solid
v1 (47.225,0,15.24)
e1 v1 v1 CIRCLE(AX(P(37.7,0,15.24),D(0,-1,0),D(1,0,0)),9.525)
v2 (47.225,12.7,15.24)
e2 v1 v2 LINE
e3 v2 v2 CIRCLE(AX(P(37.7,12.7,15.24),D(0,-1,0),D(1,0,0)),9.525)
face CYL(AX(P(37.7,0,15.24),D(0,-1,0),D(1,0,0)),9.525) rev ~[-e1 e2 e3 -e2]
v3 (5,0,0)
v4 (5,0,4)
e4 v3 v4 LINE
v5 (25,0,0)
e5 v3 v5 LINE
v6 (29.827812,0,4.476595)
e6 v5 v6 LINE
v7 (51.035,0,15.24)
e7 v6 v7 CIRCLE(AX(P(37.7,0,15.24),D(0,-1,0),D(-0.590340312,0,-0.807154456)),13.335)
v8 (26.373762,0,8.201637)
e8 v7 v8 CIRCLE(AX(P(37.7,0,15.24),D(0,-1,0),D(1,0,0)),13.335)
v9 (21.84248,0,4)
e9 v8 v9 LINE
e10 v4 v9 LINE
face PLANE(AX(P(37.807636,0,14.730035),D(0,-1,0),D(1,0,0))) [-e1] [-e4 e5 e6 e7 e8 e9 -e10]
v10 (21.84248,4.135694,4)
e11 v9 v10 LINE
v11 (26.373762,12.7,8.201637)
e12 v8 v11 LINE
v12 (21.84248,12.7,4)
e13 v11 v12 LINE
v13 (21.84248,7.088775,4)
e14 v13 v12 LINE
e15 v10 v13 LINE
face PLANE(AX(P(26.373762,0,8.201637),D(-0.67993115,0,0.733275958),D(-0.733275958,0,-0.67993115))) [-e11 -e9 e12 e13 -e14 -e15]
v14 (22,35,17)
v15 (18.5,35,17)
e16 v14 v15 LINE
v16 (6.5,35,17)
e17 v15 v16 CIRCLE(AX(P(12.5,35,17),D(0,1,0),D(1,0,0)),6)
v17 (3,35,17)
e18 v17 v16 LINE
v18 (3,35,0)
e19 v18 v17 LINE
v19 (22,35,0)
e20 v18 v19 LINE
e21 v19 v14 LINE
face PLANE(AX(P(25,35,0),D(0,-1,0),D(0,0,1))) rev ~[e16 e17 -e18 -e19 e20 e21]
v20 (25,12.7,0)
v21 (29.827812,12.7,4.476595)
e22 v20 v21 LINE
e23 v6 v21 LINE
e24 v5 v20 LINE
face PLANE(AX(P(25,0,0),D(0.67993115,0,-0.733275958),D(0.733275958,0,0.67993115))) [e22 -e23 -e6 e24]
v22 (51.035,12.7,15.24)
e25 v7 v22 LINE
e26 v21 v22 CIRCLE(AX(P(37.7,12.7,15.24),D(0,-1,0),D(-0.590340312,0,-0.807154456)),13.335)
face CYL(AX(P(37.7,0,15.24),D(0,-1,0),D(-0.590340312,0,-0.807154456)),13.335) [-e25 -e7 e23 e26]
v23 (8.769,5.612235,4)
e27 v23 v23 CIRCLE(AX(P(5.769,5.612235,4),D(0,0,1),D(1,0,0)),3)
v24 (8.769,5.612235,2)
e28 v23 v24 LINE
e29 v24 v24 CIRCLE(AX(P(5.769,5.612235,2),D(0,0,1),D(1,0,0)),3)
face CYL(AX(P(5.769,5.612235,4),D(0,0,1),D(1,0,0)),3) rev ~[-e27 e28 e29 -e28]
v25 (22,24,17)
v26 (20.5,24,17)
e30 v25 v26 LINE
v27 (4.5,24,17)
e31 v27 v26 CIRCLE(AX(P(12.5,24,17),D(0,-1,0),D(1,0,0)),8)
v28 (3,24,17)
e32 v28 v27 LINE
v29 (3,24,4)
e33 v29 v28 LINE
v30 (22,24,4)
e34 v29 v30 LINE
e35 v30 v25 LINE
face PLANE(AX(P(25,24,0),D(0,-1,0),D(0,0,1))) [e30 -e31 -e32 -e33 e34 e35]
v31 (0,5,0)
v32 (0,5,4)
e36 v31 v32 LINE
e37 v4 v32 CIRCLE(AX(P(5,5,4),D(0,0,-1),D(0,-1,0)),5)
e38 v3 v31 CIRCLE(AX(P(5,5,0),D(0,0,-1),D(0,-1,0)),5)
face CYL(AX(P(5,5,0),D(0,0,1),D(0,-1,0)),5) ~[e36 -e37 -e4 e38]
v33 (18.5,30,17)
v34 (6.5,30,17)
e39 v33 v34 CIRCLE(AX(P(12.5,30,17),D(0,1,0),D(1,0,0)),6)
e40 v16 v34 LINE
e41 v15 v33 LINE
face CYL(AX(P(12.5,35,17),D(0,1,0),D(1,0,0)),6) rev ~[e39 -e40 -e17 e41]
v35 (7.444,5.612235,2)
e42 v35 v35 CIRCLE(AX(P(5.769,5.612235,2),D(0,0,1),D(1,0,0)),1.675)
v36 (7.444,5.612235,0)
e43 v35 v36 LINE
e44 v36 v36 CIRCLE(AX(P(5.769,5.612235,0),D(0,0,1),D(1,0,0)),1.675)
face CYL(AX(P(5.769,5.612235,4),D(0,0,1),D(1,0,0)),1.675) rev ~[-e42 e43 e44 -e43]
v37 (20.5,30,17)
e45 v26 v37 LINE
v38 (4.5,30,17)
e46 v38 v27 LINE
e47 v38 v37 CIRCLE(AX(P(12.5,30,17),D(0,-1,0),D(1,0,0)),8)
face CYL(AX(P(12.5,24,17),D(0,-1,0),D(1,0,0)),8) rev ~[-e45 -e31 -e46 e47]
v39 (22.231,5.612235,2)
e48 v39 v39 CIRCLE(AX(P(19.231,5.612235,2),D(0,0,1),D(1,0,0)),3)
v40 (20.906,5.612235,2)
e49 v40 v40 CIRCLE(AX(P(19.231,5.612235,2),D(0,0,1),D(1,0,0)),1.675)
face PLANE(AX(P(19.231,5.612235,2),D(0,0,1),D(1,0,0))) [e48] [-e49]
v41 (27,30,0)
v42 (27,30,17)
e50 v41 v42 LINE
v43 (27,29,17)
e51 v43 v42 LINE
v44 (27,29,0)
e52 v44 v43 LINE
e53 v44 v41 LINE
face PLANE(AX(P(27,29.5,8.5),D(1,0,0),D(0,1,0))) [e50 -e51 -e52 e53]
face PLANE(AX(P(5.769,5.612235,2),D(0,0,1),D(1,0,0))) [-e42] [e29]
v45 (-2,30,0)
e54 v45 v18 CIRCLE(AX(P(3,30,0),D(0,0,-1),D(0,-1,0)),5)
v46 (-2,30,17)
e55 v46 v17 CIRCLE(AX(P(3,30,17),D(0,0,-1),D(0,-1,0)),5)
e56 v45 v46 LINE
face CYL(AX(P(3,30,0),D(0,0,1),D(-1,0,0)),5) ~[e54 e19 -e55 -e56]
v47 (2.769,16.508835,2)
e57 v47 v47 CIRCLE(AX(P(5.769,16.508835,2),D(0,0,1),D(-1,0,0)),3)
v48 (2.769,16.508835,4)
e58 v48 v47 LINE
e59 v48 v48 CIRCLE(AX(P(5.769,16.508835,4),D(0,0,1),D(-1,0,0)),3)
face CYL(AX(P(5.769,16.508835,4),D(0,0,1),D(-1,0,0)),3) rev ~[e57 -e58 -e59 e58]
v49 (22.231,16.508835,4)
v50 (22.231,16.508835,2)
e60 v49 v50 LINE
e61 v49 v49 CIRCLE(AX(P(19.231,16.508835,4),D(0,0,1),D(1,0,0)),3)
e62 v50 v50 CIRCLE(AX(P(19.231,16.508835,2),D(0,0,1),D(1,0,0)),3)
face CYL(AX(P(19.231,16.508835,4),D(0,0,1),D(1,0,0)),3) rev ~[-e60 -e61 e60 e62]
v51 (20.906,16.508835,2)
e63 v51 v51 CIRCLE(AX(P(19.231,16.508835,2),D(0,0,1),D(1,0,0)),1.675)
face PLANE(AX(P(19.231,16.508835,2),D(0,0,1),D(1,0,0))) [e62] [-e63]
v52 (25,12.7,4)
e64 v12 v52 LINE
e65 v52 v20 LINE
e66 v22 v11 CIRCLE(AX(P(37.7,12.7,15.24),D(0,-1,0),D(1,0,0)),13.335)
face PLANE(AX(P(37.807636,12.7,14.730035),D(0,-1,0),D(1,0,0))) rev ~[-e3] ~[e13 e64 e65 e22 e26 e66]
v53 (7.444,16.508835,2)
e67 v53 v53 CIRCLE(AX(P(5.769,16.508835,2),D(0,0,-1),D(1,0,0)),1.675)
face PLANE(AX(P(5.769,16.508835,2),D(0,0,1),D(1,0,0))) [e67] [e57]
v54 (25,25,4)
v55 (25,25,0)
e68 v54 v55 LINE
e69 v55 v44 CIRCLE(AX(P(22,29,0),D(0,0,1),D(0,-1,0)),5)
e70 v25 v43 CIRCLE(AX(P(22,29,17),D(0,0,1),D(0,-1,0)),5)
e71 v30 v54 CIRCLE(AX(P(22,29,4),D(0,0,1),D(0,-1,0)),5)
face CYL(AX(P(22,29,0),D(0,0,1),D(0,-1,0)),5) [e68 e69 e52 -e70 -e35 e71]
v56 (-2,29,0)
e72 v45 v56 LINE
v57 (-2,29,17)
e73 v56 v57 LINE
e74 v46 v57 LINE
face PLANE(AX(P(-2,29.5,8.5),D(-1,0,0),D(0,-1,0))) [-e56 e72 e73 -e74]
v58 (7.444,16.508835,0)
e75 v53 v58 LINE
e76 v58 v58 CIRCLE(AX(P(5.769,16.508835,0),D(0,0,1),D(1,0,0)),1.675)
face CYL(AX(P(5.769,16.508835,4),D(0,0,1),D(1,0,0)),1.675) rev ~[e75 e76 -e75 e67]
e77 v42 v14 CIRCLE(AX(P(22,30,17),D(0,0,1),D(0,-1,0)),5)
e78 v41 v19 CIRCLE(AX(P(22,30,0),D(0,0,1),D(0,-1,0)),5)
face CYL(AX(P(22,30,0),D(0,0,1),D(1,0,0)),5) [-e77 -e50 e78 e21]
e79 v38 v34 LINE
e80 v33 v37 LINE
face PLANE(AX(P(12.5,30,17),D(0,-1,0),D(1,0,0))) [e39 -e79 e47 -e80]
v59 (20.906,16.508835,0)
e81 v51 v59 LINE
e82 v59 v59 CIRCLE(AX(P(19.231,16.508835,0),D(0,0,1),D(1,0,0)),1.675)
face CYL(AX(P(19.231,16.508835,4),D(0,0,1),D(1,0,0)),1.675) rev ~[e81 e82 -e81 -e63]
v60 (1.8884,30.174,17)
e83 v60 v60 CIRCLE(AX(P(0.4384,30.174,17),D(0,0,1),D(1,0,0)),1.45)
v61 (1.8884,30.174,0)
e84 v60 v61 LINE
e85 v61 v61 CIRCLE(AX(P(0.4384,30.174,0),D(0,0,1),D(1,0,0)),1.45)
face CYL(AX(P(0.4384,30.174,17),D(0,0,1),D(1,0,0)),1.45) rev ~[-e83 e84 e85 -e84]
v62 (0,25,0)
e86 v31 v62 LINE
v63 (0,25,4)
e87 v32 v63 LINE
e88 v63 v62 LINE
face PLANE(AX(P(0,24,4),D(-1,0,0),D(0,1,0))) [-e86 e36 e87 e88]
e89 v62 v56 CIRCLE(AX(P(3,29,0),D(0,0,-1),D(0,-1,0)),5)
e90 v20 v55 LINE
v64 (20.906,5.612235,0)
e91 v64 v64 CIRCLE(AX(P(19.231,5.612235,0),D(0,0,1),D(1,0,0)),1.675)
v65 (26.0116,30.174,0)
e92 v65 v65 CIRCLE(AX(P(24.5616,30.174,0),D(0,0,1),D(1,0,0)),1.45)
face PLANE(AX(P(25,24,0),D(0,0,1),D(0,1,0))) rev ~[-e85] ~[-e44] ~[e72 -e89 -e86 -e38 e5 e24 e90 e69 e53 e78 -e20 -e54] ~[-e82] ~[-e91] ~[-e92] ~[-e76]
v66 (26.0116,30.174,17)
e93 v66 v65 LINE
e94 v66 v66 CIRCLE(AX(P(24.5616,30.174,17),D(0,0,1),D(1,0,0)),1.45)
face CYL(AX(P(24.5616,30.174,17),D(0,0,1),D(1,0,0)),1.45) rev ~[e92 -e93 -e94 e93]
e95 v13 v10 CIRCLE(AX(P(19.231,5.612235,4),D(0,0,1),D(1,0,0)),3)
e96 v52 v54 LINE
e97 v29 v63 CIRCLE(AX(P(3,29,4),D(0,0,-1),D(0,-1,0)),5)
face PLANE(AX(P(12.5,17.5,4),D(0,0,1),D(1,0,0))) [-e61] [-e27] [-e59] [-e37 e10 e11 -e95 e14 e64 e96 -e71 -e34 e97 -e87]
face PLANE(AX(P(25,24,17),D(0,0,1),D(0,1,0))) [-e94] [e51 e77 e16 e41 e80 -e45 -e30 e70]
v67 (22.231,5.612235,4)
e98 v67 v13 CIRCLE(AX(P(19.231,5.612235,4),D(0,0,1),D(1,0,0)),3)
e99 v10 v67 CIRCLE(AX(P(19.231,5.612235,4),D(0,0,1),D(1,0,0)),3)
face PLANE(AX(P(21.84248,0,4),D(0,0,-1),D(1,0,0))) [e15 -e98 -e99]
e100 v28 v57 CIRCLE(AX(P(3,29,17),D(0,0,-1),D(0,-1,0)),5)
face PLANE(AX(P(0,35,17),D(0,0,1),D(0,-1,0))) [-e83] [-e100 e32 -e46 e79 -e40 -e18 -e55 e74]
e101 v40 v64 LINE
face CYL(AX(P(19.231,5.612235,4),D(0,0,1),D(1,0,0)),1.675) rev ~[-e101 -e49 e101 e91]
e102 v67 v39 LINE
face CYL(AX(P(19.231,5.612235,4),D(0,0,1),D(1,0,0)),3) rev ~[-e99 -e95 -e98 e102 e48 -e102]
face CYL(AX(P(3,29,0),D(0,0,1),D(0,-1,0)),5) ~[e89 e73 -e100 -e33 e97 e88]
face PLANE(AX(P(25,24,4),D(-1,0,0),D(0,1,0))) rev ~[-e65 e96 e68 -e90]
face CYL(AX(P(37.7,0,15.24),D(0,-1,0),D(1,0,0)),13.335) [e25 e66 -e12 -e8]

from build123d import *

# Parameters (mm, degrees)
F0_W      = 25
F0_H      = 35
F1_DEPTH  = 4
F2_R      = 1.675
F3_DEPTH  = 25
F4_W      = 25
F4_H      = 11
F5_DEPTH  = 13
F7_DEPTH  = 6
F8_R      = 8
F9_DEPTH  = 6
F2_R_2    = 3
F10_DEPTH = 2
F11_W     = 11
F11_H     = 17
F12_DEPTH = 2
F13_W     = 11
F13_H     = 17
F14_DEPTH = 2
F15_R     = 1.45
F16_DEPTH = 25
F17_R     = 5
F18_R     = 9.525
F19_DEPTH = 12.7
F20_R     = 5


with BuildPart() as f1:
    # F0 (on Top) → F1 (new body)
    with BuildSketch(Plane.XY):
        with Locations((12.5, 17.5)):
            Rectangle(F0_W, F0_H)
    extrude(amount=F1_DEPTH)

    # F2 (on face) → F3 (cut)
    with BuildSketch(Plane.XY.offset(4)):
        with BuildLine():
            ThreePointArc((4.094, 16.5088346784), (5.769, 14.8338346784), (7.444, 16.5088346784))
            ThreePointArc((7.444, 16.5088346784), (5.769, 18.1838346784), (4.094, 16.5088346784))
        make_face()
        with Locations((19.231, 16.5088346784)):
            Circle(F2_R)
        with Locations((19.231, 5.6122346784)):
            Circle(F2_R)
        with Locations((5.769, 5.6122346784)):
            Circle(F2_R)
    extrude(amount=-F3_DEPTH, mode=Mode.SUBTRACT)

    # F4 (on face) → F5 (join)
    with BuildSketch(Plane.XY.offset(4)):
        with Locations((12.5, 29.5)):
            Rectangle(F4_W, F4_H)
    extrude(amount=F5_DEPTH)

    # F6 (on face) → F7 (cut)
    with BuildSketch(Plane(origin=(0, 35, 0), x_dir=(-1, 0, 0), z_dir=(0, 1, 0))):
        with BuildLine():
            ThreePointArc((-18.5, 17), (-12.5, 11), (-6.5, 17))
            Line((-6.5, 17), (-18.5, 17))
        make_face()
    extrude(amount=-F7_DEPTH, mode=Mode.SUBTRACT)

    # F8 (on face) → F9 (cut)
    with BuildSketch(Plane.XZ.offset(-24)):
        with Locations((12.5, 17)):
            Circle(F8_R)
    extrude(amount=-F9_DEPTH, mode=Mode.SUBTRACT)

    # F2 (on face) → F10 (cut)
    with BuildSketch(Plane.XY.offset(4)):
        with BuildLine():
            ThreePointArc((8.769, 16.5088346784), (5.769, 19.5088346784), (2.769, 16.5088346784))
            ThreePointArc((2.769, 16.5088346784), (5.769, 13.5088346784), (8.769, 16.5088346784))
        make_face()
        with BuildLine():
            ThreePointArc((4.094, 16.5088346784), (5.769, 18.1838346784), (7.444, 16.5088346784))
            ThreePointArc((7.444, 16.5088346784), (5.769, 14.8338346784), (4.094, 16.5088346784))
        make_face(mode=Mode.SUBTRACT)
        with Locations((19.231, 16.5088346784)):
            Circle(F2_R_2)
        with Locations((19.231, 16.5088346784)):
            Circle(F2_R, mode=Mode.SUBTRACT)
        with Locations((19.231, 5.6122346784)):
            Circle(F2_R_2)
        with Locations((19.231, 5.6122346784)):
            Circle(F2_R, mode=Mode.SUBTRACT)
        with Locations((5.769, 5.6122346784)):
            Circle(F2_R_2)
        with Locations((5.769, 5.6122346784)):
            Circle(F2_R, mode=Mode.SUBTRACT)
    extrude(amount=-F10_DEPTH, mode=Mode.SUBTRACT)

    # F11 (on face) → F12 (join)
    with BuildSketch(Plane(origin=(0, 0, 0), x_dir=(0, -1, 0), z_dir=(-1, 0, 0))):
        with Locations((-29.5, 8.5)):
            Rectangle(F11_W, F11_H)
    extrude(amount=F12_DEPTH)

    # F13 (on face) → F14 (join)
    with BuildSketch(Plane.YZ.offset(25)):
        with Locations((29.5, 8.5)):
            Rectangle(F13_W, F13_H)
    extrude(amount=F14_DEPTH)

    # F15 (on face) → F16 (cut)
    with BuildSketch(Plane.XY.offset(17)):
        with Locations((0.4384, 30.174)):
            Circle(F15_R)
        with Locations((24.5616, 30.174)):
            Circle(F15_R)
    extrude(amount=-F16_DEPTH, mode=Mode.SUBTRACT)

    # F17
    f17_edges = [f1.edges().sort_by_distance(p)[0] for p in [
        (-2, 24, 8.5),
        (-2, 35, 8.5),
        (27, 35, 8.5),
        (27, 24, 8.5),
    ]]
    fillet(f17_edges, radius=F17_R)

    # F18 (on face) → F19 (join)
    with BuildSketch(Plane.XZ):
        with BuildLine():
            Line((26.3737617011, 8.2016371934), (29.8278119435, 4.4765953247))
            ThreePointArc((29.8278119435, 4.4765953247), (43.7351717982, 3.3488719473), (51.035, 15.24))
            ThreePointArc((51.035, 15.24), (34.0402980118, 28.0629796209), (26.3737617011, 8.2016371934))
        make_face()
        with Locations((37.7, 15.24)):
            Circle(F18_R, mode=Mode.SUBTRACT)
        with BuildLine():
            Line((25, 4), (25, 0))
            Line((25, 0), (29.8278119435, 4.4765953247))
            ThreePointArc((29.8278119435, 4.4765953247), (27.9217650948, 6.1731181138), (26.3737617011, 8.2016371934))
            Line((26.3737617011, 8.2016371934), (21.8424800567, 4))
            Line((21.8424800567, 4), (25, 4))
        make_face()
        with BuildLine():
            ThreePointArc((26.3737617011, 8.2016371934), (27.9217650948, 6.1731181138), (29.8278119435, 4.4765953247))
            Line((29.8278119435, 4.4765953247), (26.3737617011, 8.2016371934))
        make_face()
    extrude(amount=-F19_DEPTH)

    # F20
    f20_edges = [f1.edges().sort_by_distance(p)[0] for p in [
        (0, 0, 2),
    ]]
    fillet(f20_edges, radius=F20_R)


solid = f1.part
